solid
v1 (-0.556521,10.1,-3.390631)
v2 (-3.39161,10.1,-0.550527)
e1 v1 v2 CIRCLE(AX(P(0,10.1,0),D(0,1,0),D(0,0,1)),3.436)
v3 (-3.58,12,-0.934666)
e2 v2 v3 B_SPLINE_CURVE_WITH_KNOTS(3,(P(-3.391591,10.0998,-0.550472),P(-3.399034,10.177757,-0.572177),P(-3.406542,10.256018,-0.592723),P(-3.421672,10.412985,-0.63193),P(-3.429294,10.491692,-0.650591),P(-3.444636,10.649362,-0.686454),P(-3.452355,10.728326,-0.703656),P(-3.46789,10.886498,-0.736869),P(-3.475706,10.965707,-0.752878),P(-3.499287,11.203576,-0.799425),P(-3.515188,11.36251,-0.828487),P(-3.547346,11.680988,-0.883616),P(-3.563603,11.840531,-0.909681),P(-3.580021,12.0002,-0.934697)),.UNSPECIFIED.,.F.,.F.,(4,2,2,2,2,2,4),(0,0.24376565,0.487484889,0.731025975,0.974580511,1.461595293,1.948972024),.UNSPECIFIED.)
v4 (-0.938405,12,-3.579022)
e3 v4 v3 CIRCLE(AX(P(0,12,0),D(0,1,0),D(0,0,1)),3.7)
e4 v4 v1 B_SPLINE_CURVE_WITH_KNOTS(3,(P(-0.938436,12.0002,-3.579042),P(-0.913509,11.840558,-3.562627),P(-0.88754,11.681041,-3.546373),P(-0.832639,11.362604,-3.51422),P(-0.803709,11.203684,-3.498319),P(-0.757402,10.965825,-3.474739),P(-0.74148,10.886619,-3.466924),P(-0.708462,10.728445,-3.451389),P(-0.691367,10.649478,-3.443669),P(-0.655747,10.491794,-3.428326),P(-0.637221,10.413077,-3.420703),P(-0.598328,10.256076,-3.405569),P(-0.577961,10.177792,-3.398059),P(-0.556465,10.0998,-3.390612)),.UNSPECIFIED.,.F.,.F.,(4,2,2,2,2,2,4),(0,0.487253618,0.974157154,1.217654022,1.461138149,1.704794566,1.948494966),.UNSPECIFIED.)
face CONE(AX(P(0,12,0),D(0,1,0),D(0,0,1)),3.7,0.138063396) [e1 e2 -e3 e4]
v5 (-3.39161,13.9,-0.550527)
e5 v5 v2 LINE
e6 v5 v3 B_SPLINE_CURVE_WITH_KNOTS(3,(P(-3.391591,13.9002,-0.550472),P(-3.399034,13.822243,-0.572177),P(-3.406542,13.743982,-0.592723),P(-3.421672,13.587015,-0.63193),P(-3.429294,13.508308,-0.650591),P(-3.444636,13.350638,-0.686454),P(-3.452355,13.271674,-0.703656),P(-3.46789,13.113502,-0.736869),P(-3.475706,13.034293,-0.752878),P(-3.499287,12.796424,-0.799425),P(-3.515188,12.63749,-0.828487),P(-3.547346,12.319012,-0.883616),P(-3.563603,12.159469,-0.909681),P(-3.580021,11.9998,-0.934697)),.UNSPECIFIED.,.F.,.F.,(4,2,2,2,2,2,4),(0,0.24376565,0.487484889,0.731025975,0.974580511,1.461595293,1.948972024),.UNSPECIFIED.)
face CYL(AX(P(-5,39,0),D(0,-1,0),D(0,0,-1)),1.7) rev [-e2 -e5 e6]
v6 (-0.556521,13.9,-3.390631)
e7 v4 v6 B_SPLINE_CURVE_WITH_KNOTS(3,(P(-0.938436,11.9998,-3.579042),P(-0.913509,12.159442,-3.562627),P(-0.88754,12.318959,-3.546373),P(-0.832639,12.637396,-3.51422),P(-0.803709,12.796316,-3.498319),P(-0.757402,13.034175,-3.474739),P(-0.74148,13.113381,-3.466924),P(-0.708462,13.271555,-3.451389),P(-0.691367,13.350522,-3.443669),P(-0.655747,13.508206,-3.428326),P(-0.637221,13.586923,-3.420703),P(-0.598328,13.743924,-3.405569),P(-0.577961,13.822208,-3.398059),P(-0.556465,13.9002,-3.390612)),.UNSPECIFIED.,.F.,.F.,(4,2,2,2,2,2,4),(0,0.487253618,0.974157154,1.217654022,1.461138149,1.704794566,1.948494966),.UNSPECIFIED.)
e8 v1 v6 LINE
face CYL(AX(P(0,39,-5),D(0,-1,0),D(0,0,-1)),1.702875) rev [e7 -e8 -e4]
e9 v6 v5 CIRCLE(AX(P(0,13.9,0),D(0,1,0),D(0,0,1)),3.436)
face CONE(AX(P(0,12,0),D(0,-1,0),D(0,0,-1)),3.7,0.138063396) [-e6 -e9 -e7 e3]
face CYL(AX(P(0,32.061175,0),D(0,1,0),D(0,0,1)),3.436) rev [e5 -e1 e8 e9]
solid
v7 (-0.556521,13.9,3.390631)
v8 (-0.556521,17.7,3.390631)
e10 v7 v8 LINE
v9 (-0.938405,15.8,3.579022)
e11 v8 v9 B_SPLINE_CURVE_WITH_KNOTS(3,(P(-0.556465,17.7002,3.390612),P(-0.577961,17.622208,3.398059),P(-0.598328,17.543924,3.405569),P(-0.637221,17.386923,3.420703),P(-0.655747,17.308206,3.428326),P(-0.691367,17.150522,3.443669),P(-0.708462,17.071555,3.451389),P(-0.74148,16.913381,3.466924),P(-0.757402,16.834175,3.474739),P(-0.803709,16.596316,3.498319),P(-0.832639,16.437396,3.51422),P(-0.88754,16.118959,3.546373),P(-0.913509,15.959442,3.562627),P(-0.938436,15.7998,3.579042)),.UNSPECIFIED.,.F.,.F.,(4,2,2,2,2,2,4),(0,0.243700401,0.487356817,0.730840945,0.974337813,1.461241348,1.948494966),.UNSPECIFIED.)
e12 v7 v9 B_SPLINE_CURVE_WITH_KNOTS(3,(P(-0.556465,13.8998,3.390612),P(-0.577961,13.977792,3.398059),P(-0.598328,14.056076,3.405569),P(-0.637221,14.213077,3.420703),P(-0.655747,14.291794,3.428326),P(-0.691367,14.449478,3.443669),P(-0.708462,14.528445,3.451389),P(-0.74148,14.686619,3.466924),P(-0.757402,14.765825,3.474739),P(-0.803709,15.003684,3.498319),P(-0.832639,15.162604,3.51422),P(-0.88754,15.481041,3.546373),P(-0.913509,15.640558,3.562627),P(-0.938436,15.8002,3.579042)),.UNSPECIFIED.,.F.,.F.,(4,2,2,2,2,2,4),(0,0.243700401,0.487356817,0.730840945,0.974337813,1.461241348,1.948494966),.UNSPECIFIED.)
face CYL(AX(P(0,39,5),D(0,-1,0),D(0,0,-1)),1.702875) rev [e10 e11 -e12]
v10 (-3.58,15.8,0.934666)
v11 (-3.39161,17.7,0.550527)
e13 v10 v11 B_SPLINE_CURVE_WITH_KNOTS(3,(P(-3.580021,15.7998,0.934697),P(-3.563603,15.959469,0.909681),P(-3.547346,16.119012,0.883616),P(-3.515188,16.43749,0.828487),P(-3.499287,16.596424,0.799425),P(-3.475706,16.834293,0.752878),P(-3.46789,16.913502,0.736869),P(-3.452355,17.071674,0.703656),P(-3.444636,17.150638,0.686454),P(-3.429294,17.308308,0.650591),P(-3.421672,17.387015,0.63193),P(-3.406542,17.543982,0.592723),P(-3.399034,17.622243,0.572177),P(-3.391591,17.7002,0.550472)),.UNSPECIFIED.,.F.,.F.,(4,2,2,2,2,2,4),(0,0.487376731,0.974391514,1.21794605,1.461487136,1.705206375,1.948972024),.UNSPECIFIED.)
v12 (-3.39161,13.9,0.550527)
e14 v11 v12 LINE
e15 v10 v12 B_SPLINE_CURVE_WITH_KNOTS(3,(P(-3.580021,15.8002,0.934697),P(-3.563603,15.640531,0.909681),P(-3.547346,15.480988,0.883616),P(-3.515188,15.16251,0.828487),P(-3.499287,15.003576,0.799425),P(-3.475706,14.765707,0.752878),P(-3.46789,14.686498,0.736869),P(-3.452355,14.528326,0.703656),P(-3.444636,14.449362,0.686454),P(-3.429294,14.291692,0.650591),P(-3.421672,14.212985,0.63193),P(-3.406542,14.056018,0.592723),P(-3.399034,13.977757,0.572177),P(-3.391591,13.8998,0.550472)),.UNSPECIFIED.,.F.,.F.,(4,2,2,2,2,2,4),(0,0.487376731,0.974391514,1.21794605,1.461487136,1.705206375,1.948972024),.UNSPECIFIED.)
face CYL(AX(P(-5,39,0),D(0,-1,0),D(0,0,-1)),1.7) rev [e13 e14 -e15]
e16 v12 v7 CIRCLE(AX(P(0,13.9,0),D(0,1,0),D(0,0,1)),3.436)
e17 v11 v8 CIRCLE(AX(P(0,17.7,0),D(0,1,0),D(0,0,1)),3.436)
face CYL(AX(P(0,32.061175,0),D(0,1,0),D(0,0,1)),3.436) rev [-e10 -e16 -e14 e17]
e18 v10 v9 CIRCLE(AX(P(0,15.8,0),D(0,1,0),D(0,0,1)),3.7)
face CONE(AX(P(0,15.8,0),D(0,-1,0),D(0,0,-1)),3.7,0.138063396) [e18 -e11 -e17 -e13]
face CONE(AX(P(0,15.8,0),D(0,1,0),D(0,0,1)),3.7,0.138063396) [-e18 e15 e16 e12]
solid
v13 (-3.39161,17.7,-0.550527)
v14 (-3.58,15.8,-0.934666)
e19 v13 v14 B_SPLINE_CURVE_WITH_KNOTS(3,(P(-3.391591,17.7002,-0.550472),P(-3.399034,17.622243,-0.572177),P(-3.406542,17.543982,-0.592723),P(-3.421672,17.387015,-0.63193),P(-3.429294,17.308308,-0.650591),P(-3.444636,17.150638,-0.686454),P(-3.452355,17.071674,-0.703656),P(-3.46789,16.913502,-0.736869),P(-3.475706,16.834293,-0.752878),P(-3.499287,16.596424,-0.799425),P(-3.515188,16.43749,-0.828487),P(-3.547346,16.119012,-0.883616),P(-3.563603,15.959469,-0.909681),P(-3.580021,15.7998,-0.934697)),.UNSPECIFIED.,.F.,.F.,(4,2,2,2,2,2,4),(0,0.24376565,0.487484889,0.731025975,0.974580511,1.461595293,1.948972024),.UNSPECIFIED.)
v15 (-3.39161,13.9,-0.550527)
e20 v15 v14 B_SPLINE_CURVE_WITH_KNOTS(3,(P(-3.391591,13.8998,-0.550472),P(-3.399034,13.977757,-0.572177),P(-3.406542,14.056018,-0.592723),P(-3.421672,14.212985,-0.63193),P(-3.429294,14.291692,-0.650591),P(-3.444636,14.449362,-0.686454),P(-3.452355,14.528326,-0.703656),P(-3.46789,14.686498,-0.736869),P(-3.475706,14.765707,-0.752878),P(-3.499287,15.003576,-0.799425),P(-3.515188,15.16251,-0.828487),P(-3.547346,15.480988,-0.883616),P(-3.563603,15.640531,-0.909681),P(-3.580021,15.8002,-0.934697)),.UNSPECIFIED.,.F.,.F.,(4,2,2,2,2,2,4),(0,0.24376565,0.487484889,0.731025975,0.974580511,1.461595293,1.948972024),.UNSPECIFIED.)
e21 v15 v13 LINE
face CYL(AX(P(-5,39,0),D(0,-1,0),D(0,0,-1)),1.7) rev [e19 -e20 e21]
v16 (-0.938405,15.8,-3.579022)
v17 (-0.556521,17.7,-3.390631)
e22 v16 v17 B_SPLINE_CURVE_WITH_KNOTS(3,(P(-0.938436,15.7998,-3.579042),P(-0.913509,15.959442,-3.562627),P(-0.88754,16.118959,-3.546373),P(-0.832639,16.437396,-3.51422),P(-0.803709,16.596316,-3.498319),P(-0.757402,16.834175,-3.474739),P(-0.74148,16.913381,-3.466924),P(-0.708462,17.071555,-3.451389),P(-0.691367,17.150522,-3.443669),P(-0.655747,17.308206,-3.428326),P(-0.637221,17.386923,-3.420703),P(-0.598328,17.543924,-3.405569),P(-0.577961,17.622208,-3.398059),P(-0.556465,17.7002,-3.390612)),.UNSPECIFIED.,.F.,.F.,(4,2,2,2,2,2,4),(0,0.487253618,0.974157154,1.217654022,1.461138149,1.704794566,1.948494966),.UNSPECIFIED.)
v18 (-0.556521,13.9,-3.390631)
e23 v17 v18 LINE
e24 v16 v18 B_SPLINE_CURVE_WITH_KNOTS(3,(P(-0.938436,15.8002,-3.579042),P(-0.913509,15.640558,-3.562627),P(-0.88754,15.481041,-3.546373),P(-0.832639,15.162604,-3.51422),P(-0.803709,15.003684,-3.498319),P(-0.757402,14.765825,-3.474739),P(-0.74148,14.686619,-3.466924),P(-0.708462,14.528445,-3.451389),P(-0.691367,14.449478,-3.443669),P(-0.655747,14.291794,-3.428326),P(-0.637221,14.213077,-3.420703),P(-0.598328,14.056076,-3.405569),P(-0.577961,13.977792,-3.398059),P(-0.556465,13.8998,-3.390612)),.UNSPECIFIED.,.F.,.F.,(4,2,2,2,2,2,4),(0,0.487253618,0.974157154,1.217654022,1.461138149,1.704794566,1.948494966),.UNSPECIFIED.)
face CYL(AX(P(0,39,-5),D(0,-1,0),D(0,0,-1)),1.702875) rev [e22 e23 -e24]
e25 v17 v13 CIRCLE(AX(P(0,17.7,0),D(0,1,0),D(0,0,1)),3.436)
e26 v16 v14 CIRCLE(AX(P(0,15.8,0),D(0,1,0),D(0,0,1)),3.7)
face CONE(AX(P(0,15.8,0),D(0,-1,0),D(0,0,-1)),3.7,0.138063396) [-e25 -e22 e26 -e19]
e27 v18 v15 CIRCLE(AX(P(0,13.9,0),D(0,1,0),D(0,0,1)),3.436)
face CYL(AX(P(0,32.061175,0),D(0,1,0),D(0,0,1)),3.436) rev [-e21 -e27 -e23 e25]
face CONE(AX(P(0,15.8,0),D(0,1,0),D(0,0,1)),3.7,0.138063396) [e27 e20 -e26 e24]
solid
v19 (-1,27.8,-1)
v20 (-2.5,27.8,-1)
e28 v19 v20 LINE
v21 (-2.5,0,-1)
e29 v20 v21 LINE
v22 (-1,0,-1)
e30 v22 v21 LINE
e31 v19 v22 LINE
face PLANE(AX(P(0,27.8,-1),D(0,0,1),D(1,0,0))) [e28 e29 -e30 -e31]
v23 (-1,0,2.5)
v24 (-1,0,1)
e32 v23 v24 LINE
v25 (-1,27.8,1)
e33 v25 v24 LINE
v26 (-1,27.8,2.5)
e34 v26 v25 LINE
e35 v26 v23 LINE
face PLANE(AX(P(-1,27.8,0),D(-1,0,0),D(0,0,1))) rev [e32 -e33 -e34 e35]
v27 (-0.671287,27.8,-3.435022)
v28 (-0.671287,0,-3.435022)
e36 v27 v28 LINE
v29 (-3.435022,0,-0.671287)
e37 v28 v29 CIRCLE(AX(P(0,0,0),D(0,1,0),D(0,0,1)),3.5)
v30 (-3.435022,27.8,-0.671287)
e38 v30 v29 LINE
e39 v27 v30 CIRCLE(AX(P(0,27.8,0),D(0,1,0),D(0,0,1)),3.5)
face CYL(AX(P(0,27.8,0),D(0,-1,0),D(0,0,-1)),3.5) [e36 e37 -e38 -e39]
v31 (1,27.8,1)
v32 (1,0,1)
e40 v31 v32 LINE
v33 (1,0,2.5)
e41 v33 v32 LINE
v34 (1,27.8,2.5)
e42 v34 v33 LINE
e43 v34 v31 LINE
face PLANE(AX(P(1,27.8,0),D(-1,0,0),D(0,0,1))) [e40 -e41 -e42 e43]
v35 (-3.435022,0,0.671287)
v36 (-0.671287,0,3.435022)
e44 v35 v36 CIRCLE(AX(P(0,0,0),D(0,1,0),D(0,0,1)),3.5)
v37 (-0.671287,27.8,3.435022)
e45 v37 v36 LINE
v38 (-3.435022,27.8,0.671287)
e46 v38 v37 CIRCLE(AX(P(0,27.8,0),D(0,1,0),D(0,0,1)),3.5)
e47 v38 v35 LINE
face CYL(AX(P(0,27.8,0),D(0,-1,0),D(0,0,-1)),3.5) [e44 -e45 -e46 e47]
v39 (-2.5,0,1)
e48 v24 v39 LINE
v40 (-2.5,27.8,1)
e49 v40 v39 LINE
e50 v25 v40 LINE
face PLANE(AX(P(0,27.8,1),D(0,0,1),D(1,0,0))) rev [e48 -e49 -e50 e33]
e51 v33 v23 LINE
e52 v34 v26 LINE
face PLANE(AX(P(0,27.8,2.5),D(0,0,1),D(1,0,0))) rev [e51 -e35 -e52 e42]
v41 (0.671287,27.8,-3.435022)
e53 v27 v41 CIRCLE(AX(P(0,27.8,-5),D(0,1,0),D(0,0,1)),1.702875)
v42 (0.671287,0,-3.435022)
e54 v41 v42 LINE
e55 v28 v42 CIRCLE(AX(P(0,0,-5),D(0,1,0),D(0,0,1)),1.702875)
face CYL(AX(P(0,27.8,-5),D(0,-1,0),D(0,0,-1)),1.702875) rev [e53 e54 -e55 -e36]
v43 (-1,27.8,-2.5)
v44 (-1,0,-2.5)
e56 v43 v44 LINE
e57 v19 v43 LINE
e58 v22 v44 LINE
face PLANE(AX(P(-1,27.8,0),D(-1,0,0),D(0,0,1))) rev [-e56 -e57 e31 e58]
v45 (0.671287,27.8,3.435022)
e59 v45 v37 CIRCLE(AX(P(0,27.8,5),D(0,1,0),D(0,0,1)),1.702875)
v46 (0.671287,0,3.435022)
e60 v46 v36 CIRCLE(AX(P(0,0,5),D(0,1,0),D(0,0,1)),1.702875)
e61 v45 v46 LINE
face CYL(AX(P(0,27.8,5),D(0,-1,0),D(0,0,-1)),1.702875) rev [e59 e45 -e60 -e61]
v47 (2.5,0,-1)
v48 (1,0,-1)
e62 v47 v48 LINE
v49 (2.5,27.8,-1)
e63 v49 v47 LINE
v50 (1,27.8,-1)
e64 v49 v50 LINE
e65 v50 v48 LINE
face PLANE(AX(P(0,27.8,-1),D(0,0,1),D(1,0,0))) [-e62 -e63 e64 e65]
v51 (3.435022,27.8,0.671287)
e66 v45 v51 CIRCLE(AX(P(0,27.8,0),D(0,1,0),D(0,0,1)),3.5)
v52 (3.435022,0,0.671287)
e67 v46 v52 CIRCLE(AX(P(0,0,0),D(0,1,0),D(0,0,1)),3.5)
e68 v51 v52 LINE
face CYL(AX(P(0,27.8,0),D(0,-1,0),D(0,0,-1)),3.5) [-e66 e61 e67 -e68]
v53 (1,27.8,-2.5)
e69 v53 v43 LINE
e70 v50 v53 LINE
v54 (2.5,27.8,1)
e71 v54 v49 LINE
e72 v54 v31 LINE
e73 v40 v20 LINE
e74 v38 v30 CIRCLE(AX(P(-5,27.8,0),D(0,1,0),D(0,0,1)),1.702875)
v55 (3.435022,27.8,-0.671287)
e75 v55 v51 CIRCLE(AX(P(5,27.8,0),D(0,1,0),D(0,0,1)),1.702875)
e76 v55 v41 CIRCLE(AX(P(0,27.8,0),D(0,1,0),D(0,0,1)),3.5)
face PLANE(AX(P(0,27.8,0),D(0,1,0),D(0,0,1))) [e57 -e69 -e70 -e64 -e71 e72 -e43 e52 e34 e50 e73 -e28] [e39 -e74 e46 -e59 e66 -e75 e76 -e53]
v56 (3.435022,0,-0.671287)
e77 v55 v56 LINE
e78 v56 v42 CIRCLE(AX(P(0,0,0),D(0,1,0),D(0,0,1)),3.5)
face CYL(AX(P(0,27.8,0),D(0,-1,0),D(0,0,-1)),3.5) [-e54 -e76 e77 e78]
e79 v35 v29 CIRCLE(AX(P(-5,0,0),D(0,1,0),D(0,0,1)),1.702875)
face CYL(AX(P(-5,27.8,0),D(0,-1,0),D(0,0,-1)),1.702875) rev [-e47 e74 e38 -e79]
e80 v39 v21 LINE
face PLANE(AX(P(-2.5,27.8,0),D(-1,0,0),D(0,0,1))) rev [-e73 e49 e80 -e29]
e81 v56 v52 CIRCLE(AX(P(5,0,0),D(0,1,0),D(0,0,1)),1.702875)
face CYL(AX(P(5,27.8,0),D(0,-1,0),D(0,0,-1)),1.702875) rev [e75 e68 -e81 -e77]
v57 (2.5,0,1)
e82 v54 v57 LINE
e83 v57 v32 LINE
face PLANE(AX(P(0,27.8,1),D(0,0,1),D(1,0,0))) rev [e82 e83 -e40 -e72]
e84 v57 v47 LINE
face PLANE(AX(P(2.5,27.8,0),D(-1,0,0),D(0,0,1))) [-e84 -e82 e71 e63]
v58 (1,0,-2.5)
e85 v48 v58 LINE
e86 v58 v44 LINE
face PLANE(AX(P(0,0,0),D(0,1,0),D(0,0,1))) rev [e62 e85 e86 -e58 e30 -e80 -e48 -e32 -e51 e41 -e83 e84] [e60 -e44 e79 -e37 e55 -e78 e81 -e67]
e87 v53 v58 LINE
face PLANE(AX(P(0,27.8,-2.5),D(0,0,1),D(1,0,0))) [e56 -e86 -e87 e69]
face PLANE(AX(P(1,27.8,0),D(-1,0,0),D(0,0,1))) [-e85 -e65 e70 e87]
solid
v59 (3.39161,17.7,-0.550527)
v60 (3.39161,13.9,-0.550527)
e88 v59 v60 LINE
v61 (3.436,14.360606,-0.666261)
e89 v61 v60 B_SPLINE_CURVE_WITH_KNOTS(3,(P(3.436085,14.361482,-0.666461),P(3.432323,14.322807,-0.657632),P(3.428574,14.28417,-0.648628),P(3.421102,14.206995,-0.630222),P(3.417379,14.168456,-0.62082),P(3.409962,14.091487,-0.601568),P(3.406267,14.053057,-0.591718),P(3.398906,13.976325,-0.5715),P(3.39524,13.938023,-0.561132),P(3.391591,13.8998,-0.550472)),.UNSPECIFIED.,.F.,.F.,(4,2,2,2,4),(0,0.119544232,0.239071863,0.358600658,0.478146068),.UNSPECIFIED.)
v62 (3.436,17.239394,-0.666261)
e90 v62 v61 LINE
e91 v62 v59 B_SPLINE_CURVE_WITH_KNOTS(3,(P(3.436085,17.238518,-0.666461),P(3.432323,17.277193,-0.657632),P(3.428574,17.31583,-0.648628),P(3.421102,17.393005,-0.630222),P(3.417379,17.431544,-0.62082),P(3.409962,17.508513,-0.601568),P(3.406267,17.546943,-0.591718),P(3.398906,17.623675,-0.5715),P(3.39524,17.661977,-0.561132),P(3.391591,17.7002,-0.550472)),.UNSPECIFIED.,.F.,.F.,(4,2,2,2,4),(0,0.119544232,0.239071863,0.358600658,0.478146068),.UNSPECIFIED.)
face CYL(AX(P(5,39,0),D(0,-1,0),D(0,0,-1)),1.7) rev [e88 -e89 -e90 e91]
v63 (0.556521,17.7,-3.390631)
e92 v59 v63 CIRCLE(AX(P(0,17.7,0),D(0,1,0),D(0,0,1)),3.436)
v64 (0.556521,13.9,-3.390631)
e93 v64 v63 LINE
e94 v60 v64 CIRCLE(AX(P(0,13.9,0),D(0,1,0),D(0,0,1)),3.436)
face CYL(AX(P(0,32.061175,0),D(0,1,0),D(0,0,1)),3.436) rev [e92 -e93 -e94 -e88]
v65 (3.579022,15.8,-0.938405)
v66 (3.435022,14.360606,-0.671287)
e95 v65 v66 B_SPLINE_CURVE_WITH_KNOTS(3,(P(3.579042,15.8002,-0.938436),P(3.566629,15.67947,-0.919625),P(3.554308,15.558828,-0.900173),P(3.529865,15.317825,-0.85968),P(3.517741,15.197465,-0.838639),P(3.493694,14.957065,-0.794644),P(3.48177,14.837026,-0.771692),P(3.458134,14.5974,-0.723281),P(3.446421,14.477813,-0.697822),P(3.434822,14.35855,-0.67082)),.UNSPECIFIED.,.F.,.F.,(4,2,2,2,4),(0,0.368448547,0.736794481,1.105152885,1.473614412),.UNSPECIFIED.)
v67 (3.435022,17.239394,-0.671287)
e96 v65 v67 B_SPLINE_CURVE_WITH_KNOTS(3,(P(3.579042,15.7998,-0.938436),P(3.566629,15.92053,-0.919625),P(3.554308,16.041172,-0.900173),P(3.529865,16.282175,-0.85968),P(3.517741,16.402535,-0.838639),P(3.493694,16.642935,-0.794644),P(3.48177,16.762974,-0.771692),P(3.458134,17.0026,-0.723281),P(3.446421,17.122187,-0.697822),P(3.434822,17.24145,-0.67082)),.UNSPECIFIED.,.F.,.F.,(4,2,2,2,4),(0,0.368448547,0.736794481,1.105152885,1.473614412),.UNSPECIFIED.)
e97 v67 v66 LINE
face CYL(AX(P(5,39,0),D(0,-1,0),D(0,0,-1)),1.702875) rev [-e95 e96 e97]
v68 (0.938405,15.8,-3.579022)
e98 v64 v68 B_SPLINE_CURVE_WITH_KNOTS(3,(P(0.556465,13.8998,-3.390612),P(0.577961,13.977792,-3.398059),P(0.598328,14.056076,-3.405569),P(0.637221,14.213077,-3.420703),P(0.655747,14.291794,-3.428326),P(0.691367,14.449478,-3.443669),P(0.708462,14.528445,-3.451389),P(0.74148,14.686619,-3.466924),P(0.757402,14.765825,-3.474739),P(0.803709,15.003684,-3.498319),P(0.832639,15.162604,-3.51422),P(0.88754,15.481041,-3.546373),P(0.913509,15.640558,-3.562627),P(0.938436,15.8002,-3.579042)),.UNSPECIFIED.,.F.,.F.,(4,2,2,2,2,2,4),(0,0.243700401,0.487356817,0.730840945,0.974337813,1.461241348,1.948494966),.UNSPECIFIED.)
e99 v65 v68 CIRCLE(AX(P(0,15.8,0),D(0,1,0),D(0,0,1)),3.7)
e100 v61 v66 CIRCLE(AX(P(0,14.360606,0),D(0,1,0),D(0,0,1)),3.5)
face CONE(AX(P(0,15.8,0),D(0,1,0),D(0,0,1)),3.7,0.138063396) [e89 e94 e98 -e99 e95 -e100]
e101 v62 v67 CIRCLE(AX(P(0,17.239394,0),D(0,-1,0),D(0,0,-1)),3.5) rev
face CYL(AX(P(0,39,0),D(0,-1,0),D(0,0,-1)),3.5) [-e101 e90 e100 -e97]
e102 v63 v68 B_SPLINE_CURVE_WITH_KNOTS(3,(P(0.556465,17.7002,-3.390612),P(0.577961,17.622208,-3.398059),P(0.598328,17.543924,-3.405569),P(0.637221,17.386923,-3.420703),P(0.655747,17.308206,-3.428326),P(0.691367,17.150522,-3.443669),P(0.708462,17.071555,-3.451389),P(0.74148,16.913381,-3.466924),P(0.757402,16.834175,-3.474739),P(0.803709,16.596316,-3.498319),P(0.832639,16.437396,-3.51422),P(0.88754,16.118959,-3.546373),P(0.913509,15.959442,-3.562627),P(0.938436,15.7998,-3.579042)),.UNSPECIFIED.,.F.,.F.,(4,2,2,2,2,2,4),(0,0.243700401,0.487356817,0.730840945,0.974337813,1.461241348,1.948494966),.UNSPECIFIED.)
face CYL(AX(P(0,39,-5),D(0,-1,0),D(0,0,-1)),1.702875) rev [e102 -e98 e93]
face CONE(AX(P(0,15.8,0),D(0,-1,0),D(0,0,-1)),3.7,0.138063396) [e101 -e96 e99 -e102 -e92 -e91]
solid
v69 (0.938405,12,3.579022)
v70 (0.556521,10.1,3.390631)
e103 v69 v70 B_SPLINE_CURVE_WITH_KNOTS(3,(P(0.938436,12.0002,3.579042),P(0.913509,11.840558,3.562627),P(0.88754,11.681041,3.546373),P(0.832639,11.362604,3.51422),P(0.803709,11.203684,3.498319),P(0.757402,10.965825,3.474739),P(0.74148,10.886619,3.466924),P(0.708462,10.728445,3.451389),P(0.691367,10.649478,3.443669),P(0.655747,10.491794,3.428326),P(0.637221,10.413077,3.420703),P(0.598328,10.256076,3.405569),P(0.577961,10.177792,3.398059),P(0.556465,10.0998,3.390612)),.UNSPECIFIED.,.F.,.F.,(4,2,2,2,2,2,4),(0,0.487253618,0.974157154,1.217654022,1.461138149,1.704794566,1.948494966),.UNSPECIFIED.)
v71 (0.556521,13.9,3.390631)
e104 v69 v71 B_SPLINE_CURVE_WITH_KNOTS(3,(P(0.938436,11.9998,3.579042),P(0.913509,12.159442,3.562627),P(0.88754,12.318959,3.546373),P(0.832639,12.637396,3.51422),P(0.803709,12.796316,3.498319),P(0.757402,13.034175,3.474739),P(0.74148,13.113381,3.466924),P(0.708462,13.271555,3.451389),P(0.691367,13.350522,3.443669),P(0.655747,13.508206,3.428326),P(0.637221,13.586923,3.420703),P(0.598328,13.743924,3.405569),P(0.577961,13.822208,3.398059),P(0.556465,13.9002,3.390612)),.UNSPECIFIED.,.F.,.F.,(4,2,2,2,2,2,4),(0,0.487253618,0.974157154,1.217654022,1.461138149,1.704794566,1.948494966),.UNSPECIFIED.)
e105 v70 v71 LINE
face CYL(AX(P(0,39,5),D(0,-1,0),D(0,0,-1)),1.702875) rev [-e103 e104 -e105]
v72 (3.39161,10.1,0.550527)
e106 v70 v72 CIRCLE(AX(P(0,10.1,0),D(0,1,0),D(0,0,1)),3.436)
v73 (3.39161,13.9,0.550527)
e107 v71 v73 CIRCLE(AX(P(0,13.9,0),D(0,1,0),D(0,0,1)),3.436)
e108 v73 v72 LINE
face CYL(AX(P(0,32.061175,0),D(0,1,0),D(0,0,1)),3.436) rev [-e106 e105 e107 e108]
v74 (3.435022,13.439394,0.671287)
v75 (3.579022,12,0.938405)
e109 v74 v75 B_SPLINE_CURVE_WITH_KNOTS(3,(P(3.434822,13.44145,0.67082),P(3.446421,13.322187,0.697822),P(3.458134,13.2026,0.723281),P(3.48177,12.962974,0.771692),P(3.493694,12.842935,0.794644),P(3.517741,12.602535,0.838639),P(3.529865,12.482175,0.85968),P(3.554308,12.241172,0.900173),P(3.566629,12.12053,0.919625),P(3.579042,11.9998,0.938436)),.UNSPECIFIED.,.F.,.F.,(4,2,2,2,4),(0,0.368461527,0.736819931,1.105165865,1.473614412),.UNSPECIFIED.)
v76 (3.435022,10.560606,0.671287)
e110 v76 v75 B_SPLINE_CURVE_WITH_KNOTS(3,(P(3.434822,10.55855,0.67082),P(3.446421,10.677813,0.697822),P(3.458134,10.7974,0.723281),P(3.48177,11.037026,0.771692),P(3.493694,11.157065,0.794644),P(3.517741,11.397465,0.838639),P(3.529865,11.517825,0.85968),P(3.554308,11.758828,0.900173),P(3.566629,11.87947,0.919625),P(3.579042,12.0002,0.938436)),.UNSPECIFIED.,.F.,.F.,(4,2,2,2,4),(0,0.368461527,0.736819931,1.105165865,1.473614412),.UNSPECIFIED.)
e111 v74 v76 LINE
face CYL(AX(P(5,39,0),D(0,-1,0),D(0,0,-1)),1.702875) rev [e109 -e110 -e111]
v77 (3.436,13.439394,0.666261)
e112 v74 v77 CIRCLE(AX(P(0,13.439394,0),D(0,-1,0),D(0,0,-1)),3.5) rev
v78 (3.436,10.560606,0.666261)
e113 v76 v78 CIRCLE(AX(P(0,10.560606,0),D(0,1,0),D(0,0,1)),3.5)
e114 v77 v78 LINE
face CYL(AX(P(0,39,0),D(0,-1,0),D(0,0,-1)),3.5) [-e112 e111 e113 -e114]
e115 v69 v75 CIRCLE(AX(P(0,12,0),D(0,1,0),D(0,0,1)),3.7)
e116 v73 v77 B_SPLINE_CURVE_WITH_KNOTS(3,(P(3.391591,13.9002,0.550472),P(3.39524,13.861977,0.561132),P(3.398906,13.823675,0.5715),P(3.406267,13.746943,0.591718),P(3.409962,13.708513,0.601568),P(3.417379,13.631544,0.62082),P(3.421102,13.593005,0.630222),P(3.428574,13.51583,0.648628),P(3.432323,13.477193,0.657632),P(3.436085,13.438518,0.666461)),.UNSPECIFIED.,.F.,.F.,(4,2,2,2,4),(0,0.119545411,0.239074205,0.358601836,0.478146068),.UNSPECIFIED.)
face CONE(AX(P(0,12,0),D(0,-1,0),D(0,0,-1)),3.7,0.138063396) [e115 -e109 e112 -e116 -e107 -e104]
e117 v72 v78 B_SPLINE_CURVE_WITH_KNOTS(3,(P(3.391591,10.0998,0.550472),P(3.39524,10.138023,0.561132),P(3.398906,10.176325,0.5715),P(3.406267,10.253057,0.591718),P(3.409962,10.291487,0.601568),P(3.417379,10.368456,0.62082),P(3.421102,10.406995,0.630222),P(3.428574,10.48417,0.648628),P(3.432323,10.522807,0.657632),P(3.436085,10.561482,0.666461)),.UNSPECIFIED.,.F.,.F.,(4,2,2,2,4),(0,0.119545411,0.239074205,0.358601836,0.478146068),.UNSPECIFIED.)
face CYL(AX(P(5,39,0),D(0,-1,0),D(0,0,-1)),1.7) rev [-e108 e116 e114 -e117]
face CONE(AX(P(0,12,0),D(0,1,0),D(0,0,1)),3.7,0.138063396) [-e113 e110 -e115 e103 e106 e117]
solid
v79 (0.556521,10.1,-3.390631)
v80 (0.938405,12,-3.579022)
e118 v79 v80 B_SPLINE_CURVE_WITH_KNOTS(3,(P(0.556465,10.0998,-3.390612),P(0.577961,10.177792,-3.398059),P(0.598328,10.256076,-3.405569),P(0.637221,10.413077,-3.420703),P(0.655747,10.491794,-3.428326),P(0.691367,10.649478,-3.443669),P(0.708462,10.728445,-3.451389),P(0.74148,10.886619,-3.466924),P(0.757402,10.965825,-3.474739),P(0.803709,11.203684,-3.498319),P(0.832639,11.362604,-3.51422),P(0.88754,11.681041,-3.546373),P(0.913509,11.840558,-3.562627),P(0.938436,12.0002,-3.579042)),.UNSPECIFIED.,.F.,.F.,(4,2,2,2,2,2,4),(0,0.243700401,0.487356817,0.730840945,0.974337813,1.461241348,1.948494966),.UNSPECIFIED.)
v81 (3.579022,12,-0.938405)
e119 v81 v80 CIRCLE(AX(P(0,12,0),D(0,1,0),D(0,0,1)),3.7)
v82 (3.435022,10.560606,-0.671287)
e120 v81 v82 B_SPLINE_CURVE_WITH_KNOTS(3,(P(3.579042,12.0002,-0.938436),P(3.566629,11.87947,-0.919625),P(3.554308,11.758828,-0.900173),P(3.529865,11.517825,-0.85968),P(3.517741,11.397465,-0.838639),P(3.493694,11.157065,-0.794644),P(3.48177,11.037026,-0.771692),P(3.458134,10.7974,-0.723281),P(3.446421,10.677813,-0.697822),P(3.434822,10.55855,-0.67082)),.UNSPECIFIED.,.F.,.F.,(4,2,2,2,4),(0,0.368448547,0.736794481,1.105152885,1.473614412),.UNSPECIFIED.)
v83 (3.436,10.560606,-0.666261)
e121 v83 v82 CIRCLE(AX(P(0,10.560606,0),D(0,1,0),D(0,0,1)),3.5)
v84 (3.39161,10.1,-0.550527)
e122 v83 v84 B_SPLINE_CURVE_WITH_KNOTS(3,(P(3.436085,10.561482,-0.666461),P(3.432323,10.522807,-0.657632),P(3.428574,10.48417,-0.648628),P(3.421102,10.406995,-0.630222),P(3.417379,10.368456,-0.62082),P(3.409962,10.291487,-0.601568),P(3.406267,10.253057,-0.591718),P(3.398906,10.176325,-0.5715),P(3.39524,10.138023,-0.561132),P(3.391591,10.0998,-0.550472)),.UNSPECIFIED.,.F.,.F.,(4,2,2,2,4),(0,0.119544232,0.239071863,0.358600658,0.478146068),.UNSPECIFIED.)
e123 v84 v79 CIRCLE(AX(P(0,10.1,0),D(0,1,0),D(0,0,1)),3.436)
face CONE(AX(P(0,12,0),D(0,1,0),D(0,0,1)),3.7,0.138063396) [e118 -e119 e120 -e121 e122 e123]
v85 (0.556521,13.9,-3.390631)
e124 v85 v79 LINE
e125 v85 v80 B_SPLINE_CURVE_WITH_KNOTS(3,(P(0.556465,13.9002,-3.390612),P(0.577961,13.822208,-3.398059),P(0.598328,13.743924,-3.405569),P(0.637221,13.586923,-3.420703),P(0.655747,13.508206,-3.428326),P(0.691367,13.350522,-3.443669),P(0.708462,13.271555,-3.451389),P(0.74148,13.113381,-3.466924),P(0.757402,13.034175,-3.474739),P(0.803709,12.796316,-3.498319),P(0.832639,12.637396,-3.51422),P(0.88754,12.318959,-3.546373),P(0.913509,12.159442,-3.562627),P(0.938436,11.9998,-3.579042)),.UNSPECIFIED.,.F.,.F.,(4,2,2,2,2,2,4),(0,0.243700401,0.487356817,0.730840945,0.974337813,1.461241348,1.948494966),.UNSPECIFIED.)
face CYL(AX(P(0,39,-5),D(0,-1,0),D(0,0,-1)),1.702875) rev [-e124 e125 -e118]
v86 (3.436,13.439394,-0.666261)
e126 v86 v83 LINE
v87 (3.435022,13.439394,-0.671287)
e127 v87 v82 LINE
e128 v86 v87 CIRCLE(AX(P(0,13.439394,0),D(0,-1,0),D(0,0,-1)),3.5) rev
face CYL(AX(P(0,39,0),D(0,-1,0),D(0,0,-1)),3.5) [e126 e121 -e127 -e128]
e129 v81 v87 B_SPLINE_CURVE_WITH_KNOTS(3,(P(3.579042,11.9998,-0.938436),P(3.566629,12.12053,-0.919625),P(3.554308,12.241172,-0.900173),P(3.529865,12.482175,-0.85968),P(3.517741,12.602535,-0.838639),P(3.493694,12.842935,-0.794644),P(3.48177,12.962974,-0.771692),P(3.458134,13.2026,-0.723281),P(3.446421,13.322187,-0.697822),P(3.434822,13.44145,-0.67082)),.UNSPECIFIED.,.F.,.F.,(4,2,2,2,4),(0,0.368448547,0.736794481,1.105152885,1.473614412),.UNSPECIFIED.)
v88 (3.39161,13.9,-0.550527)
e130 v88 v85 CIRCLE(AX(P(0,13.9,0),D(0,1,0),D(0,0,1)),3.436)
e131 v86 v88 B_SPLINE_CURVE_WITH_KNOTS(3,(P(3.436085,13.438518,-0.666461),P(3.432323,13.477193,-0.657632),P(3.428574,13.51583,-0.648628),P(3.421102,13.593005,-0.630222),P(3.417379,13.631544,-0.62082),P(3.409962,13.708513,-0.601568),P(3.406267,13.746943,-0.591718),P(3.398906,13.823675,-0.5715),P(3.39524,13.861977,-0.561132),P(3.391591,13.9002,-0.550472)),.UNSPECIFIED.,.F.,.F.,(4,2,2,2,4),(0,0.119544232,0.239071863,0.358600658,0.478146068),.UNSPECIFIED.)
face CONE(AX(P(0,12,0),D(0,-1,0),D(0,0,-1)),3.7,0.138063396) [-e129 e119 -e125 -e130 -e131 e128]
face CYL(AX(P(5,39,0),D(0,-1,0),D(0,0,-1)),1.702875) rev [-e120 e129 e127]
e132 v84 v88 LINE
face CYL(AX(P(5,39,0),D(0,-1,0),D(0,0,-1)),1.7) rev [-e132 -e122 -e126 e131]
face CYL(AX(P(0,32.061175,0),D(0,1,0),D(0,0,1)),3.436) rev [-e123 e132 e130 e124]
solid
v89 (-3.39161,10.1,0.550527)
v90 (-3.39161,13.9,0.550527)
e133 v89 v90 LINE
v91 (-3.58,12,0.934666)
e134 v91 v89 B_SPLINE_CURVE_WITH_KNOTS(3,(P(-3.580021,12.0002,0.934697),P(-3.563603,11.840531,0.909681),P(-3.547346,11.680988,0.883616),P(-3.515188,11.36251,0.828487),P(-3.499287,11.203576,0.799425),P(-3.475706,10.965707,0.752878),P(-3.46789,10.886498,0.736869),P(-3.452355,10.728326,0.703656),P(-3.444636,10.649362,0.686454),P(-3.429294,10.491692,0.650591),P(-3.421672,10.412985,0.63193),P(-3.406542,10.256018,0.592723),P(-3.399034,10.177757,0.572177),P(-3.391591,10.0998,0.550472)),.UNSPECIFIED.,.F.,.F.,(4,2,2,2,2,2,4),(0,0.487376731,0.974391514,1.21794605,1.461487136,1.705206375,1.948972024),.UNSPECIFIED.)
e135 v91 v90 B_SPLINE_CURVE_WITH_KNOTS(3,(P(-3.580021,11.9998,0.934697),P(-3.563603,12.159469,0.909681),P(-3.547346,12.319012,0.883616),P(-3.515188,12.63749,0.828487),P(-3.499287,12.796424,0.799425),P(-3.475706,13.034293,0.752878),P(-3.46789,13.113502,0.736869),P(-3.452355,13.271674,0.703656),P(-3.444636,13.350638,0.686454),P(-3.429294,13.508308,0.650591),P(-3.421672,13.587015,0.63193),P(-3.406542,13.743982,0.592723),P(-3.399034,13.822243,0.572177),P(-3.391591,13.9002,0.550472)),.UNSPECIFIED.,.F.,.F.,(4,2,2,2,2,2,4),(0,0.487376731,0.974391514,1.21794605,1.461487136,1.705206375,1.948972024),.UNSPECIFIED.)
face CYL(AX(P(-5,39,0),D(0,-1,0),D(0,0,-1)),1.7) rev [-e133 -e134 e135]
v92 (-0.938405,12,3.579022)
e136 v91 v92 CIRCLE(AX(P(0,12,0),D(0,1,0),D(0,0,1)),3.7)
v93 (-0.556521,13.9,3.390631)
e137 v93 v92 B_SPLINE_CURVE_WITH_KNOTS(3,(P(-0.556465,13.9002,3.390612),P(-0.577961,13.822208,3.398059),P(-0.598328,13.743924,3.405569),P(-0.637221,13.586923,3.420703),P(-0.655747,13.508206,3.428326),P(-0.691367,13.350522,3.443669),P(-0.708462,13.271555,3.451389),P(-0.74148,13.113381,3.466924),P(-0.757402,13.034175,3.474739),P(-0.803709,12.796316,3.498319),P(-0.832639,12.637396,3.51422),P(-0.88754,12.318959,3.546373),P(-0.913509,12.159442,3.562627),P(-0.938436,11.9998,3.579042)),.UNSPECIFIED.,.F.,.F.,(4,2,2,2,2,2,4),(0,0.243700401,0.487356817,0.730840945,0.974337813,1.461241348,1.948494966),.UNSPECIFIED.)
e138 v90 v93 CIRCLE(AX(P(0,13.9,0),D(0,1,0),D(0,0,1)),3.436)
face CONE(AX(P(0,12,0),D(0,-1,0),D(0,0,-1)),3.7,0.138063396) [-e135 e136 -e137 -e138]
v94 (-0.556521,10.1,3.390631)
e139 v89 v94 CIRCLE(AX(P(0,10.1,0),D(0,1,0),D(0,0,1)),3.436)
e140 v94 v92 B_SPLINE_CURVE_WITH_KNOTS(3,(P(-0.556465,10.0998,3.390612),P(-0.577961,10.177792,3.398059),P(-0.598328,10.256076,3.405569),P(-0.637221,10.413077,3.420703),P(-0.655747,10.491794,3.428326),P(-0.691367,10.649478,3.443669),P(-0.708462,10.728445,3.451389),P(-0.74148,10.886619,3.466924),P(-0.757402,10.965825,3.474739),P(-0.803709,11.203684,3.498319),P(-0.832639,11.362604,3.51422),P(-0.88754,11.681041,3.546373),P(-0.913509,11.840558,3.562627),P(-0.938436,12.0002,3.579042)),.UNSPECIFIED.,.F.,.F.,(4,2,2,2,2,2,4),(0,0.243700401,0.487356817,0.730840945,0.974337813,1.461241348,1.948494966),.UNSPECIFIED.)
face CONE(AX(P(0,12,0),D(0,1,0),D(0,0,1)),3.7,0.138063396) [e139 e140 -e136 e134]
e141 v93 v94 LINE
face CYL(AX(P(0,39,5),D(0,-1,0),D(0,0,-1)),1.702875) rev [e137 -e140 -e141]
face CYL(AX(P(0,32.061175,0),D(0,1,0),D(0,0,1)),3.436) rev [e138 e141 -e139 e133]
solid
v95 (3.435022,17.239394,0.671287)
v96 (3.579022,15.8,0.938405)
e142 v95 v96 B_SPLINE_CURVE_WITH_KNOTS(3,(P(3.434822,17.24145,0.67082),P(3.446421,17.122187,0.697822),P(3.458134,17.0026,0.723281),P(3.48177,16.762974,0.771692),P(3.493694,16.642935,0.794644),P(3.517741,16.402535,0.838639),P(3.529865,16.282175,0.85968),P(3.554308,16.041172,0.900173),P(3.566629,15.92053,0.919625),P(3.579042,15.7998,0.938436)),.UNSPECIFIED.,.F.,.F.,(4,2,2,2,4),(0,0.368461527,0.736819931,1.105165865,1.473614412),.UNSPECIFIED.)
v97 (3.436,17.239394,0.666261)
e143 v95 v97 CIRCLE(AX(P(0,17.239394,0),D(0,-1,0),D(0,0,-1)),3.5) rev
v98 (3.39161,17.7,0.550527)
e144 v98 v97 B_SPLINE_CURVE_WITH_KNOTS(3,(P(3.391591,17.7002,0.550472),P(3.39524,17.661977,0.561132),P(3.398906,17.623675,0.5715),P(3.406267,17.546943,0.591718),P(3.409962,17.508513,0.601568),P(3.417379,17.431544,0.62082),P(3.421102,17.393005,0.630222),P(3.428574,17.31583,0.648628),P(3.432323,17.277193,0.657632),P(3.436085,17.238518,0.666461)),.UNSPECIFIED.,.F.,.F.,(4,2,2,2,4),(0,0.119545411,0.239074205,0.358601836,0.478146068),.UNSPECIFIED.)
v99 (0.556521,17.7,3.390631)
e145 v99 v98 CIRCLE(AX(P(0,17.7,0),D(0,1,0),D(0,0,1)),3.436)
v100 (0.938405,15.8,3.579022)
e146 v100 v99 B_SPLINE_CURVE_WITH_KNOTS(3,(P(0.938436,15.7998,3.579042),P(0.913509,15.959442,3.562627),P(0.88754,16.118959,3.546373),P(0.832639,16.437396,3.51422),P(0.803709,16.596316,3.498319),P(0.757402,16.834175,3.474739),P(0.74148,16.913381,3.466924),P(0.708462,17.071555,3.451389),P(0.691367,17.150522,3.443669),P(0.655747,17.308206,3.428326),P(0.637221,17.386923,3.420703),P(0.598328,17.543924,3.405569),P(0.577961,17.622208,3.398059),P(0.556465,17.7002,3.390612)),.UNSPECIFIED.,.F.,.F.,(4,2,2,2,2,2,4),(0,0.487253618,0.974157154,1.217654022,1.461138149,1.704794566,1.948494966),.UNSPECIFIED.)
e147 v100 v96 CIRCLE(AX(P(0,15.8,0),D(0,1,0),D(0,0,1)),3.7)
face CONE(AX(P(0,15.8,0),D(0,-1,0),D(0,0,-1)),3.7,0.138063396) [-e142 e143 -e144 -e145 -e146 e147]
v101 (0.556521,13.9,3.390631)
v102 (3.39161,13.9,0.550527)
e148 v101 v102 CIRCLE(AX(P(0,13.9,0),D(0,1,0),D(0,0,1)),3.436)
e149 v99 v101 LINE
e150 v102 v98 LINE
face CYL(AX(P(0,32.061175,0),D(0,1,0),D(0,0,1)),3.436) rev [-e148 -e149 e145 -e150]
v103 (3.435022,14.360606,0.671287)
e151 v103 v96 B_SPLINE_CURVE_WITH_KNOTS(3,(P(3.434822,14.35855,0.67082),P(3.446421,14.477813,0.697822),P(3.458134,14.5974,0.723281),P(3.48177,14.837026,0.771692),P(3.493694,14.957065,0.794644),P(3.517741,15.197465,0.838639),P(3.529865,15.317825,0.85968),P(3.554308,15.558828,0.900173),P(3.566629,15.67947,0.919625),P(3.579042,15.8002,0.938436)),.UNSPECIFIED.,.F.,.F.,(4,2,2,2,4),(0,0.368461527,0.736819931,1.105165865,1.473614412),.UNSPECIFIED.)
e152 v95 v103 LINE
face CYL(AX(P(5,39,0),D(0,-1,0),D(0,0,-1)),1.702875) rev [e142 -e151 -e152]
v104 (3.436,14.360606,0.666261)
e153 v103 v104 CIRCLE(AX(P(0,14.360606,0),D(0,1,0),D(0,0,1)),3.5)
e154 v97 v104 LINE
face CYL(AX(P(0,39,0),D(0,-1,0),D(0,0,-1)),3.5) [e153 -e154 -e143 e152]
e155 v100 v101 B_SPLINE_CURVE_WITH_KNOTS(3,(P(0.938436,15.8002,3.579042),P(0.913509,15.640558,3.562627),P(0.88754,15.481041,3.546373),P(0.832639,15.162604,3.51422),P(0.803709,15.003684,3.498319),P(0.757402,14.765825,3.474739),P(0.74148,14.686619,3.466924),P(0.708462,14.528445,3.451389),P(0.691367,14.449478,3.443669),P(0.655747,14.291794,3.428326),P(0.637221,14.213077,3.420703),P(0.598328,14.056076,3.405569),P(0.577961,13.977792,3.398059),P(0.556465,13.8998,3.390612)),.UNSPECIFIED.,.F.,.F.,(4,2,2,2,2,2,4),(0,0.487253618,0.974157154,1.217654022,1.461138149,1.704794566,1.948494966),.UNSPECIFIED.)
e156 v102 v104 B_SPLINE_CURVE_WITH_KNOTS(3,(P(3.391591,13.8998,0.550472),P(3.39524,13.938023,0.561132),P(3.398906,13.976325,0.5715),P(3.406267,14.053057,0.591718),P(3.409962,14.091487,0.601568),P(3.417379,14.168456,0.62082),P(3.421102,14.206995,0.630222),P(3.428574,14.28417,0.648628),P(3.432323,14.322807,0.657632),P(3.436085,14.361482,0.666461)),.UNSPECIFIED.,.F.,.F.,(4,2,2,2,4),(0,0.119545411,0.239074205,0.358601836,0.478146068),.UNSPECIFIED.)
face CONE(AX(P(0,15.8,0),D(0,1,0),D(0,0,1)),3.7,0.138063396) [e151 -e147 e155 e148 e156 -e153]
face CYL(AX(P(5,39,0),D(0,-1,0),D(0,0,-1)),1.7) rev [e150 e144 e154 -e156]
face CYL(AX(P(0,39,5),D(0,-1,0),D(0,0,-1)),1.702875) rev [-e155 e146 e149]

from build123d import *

# Parameters (mm, degrees)
BOSS_EXTRUDE1_DEPTH = 27.8
CUT_EXTRUDE1_START  = 10.0999999
CUT_EXTRUDE1_DEPTH  = 7.6000002


# Read off the part's stored shape, not the designer's step: Cut-Extrude1
with BuildPart() as part:
    # Sketch1 → Boss-Extrude1 (new body)
    with BuildSketch(Plane(origin=(0, 0, 0), x_dir=(1, 0, 0), z_dir=(0, 1, 0))):
        with BuildLine():
            ThreePointArc((3.19363752, 1.43201934), (2.474873734, 2.474873734), (1.43201934, 3.19363752))
            ThreePointArc((1.43201934, 3.19363752), (1.058555912, 3.336084438), (0.671286664, 3.43502172))
            ThreePointArc((0.671286664, 3.43502172), (0, 3.297125136), (-0.671286664, 3.43502172))
            ThreePointArc((-0.671286664, 3.43502172), (-1.058555912, 3.336084438), (-1.43201934, 3.19363752))
            ThreePointArc((-1.43201934, 3.19363752), (-2.474873734, 2.474873734), (-3.19363752, 1.43201934))
            ThreePointArc((-3.19363752, 1.43201934), (-3.336084438, 1.058555912), (-3.43502172, 0.671286664))
            ThreePointArc((-3.43502172, 0.671286664), (-3.331955489, 0.342651883), (-3.297125136, 0))
            ThreePointArc((-3.297125136, 0), (-3.331955489, -0.342651883), (-3.43502172, -0.671286664))
            ThreePointArc((-3.43502172, -0.671286664), (-3.336084438, -1.058555912), (-3.19363752, -1.43201934))
            ThreePointArc((-3.19363752, -1.43201934), (-2.474873734, -2.474873734), (-1.43201934, -3.19363752))
            ThreePointArc((-1.43201934, -3.19363752), (-1.058555912, -3.336084438), (-0.671286664, -3.43502172))
            ThreePointArc((-0.671286664, -3.43502172), (0, -3.297125136), (0.671286664, -3.43502172))
            ThreePointArc((0.671286664, -3.43502172), (1.058555912, -3.336084438), (1.43201934, -3.19363752))
            ThreePointArc((1.43201934, -3.19363752), (2.474873734, -2.474873734), (3.19363752, -1.43201934))
            ThreePointArc((3.19363752, -1.43201934), (3.336084438, -1.058555912), (3.43502172, -0.671286664))
            ThreePointArc((3.43502172, -0.671286664), (3.297125136, 0), (3.43502172, 0.671286664))
            ThreePointArc((3.43502172, 0.671286664), (3.336084438, 1.058555912), (3.19363752, 1.43201934))
        make_face()
        Polygon((1, -1), (1, -2.5), (-1, -2.5), (-1, -1), (-2.5, -1), (-2.5, 1), (-1, 1), (-1, 2.5), (1, 2.5), (1, 1), (2.5, 1), (2.5, -1), align=None, mode=Mode.SUBTRACT)
    extrude(amount=BOSS_EXTRUDE1_DEPTH)


with BuildPart() as body_2:
    # Sketch2 → Revolve4 (revolve)
    with BuildSketch(Plane.XY, mode=Mode.PRIVATE) as revolve4_sk:
        Polygon((3.7, 15.8), (3.436, 17.7), (3.436, 15.8), (3.436, 13.9), align=None)
        Polygon((3.436, 10.1), (3.436, 12), (3.436, 13.9), (3.7, 12), align=None)
    revolve(revolve4_sk.sketch.rotate(Axis((0, 32.061175454, 0), (0, -1, 0)), 90), axis=Axis((0, 32.061175454, 0), (0, -1, 0)))

    # Cut-Extrude1 outline → Cut-Extrude1 (cut)
    with BuildSketch(Plane(origin=(0, 0, 0), x_dir=(1, 0, 0), z_dir=(0, 1, 0)).offset(CUT_EXTRUDE1_START)):
        with BuildLine():
            ThreePointArc((0.556520579, 3.390631289), (0, 6.702874864), (-0.556520579, 3.390631289))
            ThreePointArc((-0.556520579, 3.390631289), (0, 3.436), (0.556520579, 3.390631289))
        make_face()
        with BuildLine():
            ThreePointArc((3.435021543, -0.67128625), (6.702874864, 0), (3.435021543, 0.67128625))
            ThreePointArc((3.435021543, 0.67128625), (3.435511814, 0.668773933), (3.436, 0.66626121))
            ThreePointArc((3.436, 0.66626121), (3.412749609, 0.608798977), (3.391609595, 0.550527297))
            ThreePointArc((3.391609595, 0.550527297), (3.436, 0), (3.391609602, -0.550527298))
            ThreePointArc((3.391609602, -0.550527298), (3.412749609, -0.608798977), (3.436, -0.66626121))
            ThreePointArc((3.436, -0.66626121), (3.435511814, -0.668773933), (3.435021543, -0.67128625))
        make_face()
        with BuildLine():
            ThreePointArc((-3.391609614, -0.550527225), (-3.436, 0), (-3.391609614, 0.550527225))
            ThreePointArc((-3.391609614, 0.550527225), (-6.7, 0), (-3.391609614, -0.550527225))
        make_face()
        with BuildLine():
            ThreePointArc((0.556520586, -3.390631333), (0, -3.436), (-0.556520586, -3.390631333))
            ThreePointArc((-0.556520586, -3.390631333), (0, -6.702874864), (0.556520586, -3.390631333))
        make_face()
    extrude(amount=CUT_EXTRUDE1_DEPTH, mode=Mode.SUBTRACT)


solid = Compound([part.part, body_2.part])
